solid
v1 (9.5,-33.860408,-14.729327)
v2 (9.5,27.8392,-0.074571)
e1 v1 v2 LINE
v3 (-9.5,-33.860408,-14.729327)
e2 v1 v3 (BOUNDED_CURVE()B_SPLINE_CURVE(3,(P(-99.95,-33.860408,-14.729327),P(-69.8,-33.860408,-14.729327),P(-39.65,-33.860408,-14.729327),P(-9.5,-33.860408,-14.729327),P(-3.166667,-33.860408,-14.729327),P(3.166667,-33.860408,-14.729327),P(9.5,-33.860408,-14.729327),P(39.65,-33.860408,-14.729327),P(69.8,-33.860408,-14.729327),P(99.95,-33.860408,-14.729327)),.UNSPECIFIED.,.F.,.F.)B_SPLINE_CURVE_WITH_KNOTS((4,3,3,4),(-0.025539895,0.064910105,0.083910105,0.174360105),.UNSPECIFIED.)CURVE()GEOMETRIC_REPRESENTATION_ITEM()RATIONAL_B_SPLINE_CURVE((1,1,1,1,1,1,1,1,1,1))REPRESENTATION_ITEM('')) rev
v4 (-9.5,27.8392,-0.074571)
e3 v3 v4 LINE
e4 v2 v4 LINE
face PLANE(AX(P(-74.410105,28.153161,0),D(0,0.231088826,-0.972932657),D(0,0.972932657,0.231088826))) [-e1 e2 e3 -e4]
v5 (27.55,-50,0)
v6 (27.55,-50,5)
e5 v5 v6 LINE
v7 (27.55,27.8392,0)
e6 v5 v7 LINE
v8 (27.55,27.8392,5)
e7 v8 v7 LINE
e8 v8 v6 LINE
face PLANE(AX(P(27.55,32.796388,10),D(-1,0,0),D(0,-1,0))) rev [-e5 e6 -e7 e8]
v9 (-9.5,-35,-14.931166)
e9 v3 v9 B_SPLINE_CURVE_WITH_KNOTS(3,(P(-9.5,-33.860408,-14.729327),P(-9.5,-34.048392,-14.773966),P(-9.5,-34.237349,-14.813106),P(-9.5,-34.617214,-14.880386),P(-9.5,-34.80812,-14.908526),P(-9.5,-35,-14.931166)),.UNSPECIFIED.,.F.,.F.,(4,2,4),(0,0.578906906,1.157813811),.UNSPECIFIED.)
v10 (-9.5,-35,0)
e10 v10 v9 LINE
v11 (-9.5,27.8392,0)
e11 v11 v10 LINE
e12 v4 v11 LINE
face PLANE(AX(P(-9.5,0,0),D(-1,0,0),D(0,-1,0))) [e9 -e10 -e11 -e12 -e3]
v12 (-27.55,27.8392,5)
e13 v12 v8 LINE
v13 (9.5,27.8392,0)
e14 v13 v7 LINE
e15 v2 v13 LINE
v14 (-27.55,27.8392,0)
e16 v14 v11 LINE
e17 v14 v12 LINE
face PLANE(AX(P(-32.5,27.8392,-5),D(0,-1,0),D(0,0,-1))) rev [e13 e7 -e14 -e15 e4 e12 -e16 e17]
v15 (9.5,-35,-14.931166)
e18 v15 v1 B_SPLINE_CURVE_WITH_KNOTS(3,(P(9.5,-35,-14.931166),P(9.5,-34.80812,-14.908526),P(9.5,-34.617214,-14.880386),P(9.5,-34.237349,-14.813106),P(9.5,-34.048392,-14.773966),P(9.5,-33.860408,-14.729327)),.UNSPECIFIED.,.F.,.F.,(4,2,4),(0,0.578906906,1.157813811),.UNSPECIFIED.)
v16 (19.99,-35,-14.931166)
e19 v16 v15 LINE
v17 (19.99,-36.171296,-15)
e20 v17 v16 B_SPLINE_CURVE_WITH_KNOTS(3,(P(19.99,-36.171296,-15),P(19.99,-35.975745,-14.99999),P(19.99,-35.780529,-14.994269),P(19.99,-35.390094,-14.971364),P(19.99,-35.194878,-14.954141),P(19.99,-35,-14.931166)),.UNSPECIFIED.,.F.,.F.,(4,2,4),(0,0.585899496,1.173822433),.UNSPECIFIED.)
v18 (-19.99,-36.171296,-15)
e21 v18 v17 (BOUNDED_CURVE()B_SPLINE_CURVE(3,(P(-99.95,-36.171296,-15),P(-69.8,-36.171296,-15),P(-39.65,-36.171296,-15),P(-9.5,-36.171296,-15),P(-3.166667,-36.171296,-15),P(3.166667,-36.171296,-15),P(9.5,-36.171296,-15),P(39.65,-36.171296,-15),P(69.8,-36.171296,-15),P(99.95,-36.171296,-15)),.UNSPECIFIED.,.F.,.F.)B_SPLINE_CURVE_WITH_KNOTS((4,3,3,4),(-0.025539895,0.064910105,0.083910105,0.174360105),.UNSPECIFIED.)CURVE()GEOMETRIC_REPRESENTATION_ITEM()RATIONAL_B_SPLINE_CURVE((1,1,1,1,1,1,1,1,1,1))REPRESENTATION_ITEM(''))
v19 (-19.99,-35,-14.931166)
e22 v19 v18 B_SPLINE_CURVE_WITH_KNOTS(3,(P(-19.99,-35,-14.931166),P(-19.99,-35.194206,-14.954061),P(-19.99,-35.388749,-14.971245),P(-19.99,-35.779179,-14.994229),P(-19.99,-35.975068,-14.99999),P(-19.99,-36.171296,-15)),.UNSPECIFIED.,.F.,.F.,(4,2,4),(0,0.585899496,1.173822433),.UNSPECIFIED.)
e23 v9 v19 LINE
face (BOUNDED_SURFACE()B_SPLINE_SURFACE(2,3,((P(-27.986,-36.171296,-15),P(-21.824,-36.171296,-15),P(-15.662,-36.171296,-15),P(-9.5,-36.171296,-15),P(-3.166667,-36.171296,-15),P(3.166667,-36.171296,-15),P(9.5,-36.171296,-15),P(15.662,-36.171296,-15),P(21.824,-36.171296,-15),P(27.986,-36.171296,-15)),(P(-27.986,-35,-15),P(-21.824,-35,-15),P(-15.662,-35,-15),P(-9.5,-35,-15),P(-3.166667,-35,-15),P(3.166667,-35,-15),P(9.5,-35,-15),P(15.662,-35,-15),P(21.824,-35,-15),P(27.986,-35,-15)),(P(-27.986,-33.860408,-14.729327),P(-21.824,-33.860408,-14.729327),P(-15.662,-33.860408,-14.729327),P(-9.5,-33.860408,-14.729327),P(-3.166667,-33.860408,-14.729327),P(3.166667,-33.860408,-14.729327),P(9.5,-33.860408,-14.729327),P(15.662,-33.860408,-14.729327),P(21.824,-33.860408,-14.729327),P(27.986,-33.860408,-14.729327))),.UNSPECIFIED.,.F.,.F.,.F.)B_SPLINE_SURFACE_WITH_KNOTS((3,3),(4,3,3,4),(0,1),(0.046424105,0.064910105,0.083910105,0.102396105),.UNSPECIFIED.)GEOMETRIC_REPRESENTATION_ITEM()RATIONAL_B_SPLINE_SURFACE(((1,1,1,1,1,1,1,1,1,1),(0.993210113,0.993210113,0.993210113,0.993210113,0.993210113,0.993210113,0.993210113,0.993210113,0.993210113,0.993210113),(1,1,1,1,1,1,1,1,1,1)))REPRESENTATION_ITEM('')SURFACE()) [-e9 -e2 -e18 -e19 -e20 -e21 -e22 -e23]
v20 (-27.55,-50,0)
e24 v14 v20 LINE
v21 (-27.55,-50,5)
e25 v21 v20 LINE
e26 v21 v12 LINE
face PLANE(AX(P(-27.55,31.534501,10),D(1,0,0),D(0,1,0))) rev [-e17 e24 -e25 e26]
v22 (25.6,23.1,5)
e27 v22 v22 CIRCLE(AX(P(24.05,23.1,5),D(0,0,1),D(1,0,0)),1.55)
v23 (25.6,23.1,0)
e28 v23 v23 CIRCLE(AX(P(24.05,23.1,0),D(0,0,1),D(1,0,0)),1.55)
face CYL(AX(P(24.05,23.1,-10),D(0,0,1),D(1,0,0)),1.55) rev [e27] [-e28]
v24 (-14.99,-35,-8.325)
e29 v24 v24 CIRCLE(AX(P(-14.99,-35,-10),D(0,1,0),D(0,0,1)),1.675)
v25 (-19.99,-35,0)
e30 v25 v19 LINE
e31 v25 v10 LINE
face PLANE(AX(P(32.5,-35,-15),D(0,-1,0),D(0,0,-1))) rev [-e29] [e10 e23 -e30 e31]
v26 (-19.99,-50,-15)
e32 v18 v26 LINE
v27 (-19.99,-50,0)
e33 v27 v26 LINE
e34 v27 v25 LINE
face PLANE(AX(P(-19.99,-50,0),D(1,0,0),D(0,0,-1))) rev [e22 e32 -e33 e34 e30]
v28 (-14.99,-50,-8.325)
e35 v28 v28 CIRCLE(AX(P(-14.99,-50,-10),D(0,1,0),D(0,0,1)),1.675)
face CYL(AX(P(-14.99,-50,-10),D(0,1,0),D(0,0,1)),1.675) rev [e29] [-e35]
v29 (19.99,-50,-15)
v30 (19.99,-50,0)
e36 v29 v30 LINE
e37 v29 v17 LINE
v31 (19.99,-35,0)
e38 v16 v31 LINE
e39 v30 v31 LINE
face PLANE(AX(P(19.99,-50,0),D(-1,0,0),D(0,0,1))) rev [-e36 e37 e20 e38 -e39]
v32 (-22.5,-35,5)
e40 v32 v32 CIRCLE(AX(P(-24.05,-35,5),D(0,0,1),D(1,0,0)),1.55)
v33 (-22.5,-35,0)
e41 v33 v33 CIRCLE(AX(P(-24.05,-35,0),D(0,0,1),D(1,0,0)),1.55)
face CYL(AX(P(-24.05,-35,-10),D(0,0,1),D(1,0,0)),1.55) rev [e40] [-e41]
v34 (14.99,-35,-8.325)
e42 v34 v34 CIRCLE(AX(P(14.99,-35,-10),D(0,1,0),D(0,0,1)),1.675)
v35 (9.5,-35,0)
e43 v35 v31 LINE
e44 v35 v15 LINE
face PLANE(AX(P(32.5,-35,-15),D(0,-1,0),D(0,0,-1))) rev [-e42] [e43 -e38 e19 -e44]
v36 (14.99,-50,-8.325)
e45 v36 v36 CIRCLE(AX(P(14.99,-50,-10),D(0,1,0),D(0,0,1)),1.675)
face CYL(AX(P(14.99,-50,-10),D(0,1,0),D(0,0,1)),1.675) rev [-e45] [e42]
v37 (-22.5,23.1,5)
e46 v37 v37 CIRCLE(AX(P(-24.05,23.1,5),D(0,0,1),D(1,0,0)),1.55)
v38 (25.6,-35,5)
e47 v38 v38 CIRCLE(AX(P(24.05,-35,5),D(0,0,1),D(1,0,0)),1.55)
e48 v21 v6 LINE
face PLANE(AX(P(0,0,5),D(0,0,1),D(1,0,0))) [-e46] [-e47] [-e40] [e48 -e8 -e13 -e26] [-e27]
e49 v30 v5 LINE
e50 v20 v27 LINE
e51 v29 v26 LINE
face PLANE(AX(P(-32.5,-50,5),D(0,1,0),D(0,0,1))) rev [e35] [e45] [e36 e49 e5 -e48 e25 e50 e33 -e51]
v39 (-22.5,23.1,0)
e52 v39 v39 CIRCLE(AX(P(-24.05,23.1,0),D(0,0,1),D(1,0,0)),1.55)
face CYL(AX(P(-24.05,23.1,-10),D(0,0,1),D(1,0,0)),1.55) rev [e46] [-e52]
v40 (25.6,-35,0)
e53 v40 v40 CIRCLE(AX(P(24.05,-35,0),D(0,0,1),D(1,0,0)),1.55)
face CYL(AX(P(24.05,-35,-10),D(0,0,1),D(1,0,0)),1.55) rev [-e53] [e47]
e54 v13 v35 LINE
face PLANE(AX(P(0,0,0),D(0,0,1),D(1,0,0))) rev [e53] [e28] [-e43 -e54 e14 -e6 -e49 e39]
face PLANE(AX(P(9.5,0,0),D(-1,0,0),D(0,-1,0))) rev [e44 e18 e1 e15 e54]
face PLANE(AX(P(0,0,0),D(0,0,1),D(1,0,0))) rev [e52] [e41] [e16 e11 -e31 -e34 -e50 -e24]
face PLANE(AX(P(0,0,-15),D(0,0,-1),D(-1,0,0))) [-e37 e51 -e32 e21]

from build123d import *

# Parameters (mm, degrees)
SKETCH_1_W          = 65
SKETCH_1_H          = 100
EXTRUDE_1_DEPTH     = 5
SKETCH_3_W          = 65
SKETCH_3_H          = 15
EXTRUDE_2_DEPTH     = 15
SKETCH_4_R          = 1.675
CUT_EXTRUDE_1_DEPTH = 15
SKETCH_8_R          = 1.55
CUT_EXTRUDE_2_DEPTH = 15
EXTRUDE_4_DEPTH     = 19
SKETCH_10_W         = 12.51
SKETCH_10_H         = 20.752848232
SKETCH_10_H_2       = 21.550243719
CUT_EXTRUDE_3_DEPTH = 93.229333728
SKETCH_11_W         = 65
SKETCH_11_H         = 22.160800115
CUT_EXTRUDE_4_DEPTH = 10
FILLET_START        = -21
FILLET_1_DEPTH      = 42
SKETCH_12_W         = 13.248565373
SKETCH_12_H         = 85.777871489
SKETCH_12_W_2       = 8.637190958
SKETCH_12_H_2       = 86.586054809
CUT_EXTRUDE_6_DEPTH = 10


with BuildPart() as part:
    # 草图1 → 凸台-拉伸1 (new body)
    with BuildSketch(Plane.XY):
        Rectangle(SKETCH_1_W, SKETCH_1_H)
    extrude(amount=EXTRUDE_1_DEPTH)

    # 草图3 → 凸台-拉伸2 (add)
    with BuildSketch(Plane(origin=(0, 0, 0), x_dir=(-1, 0, 0), z_dir=(0, 0, -1))):
        with Locations((0, -42.5)):
            Rectangle(SKETCH_3_W, SKETCH_3_H)
    extrude(amount=EXTRUDE_2_DEPTH)

    # 草图4 → 切除-拉伸1 (cut)
    with BuildSketch(Plane(origin=(0, -35, 0), x_dir=(1, 0, 0), z_dir=(0, 1, 0))):
        with Locations(Location((-14.99, 10, 0), (0, 0, 270))):
            Circle(SKETCH_4_R)
        with Locations(Location((14.99, 10, 0), (0, 0, 270))):
            Circle(SKETCH_4_R)
    extrude(amount=-CUT_EXTRUDE_1_DEPTH, mode=Mode.SUBTRACT)

    # 草图8 → 切除-拉伸2 (cut)
    with BuildSketch(Plane.XY.offset(5)):
        with Locations((-24.05, 23.1)):
            Circle(SKETCH_8_R)
        with Locations((24.05, 23.1)):
            Circle(SKETCH_8_R)
        with Locations((-24.05, -35)):
            Circle(SKETCH_8_R)
        with Locations((24.05, -35)):
            Circle(SKETCH_8_R)
    extrude(amount=-CUT_EXTRUDE_2_DEPTH, mode=Mode.SUBTRACT)

    # 草图9 → 凸台-拉伸4 (add)
    with BuildSketch(Plane(origin=(9.5, 0, 0), x_dir=(0, 0, -1), z_dir=(1, 0, 0))):
        Polygon((15, -35), (0, -35), (0, 28.153160969), align=None)
    extrude(amount=-EXTRUDE_4_DEPTH)

    # 草图10 → 切除-拉伸3 (cut, through all)
    with BuildSketch(Plane(origin=(0, -35, 0), x_dir=(1, 0, 0), z_dir=(0, 1, 0))):
        with Locations((26.245, 10.376424116)):
            Rectangle(SKETCH_10_W, SKETCH_10_H)
        with Locations((-26.245, 10.77512186)):
            Rectangle(SKETCH_10_W, SKETCH_10_H_2)
    extrude(amount=-CUT_EXTRUDE_3_DEPTH, mode=Mode.SUBTRACT)

    # 草图11 → 切除-拉伸4 (cut)
    with BuildSketch(Plane.XY.offset(5)):
        with Locations((0, 38.919599942)):
            Rectangle(SKETCH_11_W, SKETCH_11_H)
    extrude(amount=-CUT_EXTRUDE_4_DEPTH, mode=Mode.SUBTRACT)

    # 圆角1: read off the stored shape, not the designer's step
    # 圆角1 outline → 圆角1 (cut)
    with BuildSketch(Plane.YZ.offset(FILLET_START)):
        with BuildLine():
            Line((-36.171296068, -15), (-35, -15))
            Line((-35, -15), (-33.860407805, -14.729326566))
            add(Edge.make_bspline(
                [(-33.860407805, -14.729326566), (-34.0852258, -14.782724842), (-34.31196566, -14.829719593), (-34.540261945, -14.87017776), (-34.769736346, -14.904008746), (-35.233444691, -14.958699176), (-35.467701672, -14.979373092), (-35.702365681, -14.993139997), (-35.937031343, -15), (-36.171296068, -15)],
                knots=[0.503429998, 0.503429998, 0.503429998, 0.503429998, 0.503429998, 0.503429998, 1, 1, 1, 1, 1.503429998, 1.503429998, 1.503429998, 1.503429998, 1.503429998, 1.503429998], degree=5, weights=[1, 1, 0.99999889, 0.999998883, 1, 1, 0.999998819, 0.999998827, 1, 1]))
        make_face()
    extrude(amount=FILLET_1_DEPTH, mode=Mode.SUBTRACT)

    # 草图12 → 切除-拉伸6 (cut)
    with BuildSketch(Plane(origin=(0, 0, 0), x_dir=(-1, 0, 0), z_dir=(0, 0, -1))):
        with Locations((-34.174282686, -10.092547721)):
            Rectangle(SKETCH_12_W, SKETCH_12_H)
        with Locations((31.868595479, -11.75852662)):
            Rectangle(SKETCH_12_W_2, SKETCH_12_H_2)
    extrude(amount=-CUT_EXTRUDE_6_DEPTH, mode=Mode.SUBTRACT)


solid = part.part
